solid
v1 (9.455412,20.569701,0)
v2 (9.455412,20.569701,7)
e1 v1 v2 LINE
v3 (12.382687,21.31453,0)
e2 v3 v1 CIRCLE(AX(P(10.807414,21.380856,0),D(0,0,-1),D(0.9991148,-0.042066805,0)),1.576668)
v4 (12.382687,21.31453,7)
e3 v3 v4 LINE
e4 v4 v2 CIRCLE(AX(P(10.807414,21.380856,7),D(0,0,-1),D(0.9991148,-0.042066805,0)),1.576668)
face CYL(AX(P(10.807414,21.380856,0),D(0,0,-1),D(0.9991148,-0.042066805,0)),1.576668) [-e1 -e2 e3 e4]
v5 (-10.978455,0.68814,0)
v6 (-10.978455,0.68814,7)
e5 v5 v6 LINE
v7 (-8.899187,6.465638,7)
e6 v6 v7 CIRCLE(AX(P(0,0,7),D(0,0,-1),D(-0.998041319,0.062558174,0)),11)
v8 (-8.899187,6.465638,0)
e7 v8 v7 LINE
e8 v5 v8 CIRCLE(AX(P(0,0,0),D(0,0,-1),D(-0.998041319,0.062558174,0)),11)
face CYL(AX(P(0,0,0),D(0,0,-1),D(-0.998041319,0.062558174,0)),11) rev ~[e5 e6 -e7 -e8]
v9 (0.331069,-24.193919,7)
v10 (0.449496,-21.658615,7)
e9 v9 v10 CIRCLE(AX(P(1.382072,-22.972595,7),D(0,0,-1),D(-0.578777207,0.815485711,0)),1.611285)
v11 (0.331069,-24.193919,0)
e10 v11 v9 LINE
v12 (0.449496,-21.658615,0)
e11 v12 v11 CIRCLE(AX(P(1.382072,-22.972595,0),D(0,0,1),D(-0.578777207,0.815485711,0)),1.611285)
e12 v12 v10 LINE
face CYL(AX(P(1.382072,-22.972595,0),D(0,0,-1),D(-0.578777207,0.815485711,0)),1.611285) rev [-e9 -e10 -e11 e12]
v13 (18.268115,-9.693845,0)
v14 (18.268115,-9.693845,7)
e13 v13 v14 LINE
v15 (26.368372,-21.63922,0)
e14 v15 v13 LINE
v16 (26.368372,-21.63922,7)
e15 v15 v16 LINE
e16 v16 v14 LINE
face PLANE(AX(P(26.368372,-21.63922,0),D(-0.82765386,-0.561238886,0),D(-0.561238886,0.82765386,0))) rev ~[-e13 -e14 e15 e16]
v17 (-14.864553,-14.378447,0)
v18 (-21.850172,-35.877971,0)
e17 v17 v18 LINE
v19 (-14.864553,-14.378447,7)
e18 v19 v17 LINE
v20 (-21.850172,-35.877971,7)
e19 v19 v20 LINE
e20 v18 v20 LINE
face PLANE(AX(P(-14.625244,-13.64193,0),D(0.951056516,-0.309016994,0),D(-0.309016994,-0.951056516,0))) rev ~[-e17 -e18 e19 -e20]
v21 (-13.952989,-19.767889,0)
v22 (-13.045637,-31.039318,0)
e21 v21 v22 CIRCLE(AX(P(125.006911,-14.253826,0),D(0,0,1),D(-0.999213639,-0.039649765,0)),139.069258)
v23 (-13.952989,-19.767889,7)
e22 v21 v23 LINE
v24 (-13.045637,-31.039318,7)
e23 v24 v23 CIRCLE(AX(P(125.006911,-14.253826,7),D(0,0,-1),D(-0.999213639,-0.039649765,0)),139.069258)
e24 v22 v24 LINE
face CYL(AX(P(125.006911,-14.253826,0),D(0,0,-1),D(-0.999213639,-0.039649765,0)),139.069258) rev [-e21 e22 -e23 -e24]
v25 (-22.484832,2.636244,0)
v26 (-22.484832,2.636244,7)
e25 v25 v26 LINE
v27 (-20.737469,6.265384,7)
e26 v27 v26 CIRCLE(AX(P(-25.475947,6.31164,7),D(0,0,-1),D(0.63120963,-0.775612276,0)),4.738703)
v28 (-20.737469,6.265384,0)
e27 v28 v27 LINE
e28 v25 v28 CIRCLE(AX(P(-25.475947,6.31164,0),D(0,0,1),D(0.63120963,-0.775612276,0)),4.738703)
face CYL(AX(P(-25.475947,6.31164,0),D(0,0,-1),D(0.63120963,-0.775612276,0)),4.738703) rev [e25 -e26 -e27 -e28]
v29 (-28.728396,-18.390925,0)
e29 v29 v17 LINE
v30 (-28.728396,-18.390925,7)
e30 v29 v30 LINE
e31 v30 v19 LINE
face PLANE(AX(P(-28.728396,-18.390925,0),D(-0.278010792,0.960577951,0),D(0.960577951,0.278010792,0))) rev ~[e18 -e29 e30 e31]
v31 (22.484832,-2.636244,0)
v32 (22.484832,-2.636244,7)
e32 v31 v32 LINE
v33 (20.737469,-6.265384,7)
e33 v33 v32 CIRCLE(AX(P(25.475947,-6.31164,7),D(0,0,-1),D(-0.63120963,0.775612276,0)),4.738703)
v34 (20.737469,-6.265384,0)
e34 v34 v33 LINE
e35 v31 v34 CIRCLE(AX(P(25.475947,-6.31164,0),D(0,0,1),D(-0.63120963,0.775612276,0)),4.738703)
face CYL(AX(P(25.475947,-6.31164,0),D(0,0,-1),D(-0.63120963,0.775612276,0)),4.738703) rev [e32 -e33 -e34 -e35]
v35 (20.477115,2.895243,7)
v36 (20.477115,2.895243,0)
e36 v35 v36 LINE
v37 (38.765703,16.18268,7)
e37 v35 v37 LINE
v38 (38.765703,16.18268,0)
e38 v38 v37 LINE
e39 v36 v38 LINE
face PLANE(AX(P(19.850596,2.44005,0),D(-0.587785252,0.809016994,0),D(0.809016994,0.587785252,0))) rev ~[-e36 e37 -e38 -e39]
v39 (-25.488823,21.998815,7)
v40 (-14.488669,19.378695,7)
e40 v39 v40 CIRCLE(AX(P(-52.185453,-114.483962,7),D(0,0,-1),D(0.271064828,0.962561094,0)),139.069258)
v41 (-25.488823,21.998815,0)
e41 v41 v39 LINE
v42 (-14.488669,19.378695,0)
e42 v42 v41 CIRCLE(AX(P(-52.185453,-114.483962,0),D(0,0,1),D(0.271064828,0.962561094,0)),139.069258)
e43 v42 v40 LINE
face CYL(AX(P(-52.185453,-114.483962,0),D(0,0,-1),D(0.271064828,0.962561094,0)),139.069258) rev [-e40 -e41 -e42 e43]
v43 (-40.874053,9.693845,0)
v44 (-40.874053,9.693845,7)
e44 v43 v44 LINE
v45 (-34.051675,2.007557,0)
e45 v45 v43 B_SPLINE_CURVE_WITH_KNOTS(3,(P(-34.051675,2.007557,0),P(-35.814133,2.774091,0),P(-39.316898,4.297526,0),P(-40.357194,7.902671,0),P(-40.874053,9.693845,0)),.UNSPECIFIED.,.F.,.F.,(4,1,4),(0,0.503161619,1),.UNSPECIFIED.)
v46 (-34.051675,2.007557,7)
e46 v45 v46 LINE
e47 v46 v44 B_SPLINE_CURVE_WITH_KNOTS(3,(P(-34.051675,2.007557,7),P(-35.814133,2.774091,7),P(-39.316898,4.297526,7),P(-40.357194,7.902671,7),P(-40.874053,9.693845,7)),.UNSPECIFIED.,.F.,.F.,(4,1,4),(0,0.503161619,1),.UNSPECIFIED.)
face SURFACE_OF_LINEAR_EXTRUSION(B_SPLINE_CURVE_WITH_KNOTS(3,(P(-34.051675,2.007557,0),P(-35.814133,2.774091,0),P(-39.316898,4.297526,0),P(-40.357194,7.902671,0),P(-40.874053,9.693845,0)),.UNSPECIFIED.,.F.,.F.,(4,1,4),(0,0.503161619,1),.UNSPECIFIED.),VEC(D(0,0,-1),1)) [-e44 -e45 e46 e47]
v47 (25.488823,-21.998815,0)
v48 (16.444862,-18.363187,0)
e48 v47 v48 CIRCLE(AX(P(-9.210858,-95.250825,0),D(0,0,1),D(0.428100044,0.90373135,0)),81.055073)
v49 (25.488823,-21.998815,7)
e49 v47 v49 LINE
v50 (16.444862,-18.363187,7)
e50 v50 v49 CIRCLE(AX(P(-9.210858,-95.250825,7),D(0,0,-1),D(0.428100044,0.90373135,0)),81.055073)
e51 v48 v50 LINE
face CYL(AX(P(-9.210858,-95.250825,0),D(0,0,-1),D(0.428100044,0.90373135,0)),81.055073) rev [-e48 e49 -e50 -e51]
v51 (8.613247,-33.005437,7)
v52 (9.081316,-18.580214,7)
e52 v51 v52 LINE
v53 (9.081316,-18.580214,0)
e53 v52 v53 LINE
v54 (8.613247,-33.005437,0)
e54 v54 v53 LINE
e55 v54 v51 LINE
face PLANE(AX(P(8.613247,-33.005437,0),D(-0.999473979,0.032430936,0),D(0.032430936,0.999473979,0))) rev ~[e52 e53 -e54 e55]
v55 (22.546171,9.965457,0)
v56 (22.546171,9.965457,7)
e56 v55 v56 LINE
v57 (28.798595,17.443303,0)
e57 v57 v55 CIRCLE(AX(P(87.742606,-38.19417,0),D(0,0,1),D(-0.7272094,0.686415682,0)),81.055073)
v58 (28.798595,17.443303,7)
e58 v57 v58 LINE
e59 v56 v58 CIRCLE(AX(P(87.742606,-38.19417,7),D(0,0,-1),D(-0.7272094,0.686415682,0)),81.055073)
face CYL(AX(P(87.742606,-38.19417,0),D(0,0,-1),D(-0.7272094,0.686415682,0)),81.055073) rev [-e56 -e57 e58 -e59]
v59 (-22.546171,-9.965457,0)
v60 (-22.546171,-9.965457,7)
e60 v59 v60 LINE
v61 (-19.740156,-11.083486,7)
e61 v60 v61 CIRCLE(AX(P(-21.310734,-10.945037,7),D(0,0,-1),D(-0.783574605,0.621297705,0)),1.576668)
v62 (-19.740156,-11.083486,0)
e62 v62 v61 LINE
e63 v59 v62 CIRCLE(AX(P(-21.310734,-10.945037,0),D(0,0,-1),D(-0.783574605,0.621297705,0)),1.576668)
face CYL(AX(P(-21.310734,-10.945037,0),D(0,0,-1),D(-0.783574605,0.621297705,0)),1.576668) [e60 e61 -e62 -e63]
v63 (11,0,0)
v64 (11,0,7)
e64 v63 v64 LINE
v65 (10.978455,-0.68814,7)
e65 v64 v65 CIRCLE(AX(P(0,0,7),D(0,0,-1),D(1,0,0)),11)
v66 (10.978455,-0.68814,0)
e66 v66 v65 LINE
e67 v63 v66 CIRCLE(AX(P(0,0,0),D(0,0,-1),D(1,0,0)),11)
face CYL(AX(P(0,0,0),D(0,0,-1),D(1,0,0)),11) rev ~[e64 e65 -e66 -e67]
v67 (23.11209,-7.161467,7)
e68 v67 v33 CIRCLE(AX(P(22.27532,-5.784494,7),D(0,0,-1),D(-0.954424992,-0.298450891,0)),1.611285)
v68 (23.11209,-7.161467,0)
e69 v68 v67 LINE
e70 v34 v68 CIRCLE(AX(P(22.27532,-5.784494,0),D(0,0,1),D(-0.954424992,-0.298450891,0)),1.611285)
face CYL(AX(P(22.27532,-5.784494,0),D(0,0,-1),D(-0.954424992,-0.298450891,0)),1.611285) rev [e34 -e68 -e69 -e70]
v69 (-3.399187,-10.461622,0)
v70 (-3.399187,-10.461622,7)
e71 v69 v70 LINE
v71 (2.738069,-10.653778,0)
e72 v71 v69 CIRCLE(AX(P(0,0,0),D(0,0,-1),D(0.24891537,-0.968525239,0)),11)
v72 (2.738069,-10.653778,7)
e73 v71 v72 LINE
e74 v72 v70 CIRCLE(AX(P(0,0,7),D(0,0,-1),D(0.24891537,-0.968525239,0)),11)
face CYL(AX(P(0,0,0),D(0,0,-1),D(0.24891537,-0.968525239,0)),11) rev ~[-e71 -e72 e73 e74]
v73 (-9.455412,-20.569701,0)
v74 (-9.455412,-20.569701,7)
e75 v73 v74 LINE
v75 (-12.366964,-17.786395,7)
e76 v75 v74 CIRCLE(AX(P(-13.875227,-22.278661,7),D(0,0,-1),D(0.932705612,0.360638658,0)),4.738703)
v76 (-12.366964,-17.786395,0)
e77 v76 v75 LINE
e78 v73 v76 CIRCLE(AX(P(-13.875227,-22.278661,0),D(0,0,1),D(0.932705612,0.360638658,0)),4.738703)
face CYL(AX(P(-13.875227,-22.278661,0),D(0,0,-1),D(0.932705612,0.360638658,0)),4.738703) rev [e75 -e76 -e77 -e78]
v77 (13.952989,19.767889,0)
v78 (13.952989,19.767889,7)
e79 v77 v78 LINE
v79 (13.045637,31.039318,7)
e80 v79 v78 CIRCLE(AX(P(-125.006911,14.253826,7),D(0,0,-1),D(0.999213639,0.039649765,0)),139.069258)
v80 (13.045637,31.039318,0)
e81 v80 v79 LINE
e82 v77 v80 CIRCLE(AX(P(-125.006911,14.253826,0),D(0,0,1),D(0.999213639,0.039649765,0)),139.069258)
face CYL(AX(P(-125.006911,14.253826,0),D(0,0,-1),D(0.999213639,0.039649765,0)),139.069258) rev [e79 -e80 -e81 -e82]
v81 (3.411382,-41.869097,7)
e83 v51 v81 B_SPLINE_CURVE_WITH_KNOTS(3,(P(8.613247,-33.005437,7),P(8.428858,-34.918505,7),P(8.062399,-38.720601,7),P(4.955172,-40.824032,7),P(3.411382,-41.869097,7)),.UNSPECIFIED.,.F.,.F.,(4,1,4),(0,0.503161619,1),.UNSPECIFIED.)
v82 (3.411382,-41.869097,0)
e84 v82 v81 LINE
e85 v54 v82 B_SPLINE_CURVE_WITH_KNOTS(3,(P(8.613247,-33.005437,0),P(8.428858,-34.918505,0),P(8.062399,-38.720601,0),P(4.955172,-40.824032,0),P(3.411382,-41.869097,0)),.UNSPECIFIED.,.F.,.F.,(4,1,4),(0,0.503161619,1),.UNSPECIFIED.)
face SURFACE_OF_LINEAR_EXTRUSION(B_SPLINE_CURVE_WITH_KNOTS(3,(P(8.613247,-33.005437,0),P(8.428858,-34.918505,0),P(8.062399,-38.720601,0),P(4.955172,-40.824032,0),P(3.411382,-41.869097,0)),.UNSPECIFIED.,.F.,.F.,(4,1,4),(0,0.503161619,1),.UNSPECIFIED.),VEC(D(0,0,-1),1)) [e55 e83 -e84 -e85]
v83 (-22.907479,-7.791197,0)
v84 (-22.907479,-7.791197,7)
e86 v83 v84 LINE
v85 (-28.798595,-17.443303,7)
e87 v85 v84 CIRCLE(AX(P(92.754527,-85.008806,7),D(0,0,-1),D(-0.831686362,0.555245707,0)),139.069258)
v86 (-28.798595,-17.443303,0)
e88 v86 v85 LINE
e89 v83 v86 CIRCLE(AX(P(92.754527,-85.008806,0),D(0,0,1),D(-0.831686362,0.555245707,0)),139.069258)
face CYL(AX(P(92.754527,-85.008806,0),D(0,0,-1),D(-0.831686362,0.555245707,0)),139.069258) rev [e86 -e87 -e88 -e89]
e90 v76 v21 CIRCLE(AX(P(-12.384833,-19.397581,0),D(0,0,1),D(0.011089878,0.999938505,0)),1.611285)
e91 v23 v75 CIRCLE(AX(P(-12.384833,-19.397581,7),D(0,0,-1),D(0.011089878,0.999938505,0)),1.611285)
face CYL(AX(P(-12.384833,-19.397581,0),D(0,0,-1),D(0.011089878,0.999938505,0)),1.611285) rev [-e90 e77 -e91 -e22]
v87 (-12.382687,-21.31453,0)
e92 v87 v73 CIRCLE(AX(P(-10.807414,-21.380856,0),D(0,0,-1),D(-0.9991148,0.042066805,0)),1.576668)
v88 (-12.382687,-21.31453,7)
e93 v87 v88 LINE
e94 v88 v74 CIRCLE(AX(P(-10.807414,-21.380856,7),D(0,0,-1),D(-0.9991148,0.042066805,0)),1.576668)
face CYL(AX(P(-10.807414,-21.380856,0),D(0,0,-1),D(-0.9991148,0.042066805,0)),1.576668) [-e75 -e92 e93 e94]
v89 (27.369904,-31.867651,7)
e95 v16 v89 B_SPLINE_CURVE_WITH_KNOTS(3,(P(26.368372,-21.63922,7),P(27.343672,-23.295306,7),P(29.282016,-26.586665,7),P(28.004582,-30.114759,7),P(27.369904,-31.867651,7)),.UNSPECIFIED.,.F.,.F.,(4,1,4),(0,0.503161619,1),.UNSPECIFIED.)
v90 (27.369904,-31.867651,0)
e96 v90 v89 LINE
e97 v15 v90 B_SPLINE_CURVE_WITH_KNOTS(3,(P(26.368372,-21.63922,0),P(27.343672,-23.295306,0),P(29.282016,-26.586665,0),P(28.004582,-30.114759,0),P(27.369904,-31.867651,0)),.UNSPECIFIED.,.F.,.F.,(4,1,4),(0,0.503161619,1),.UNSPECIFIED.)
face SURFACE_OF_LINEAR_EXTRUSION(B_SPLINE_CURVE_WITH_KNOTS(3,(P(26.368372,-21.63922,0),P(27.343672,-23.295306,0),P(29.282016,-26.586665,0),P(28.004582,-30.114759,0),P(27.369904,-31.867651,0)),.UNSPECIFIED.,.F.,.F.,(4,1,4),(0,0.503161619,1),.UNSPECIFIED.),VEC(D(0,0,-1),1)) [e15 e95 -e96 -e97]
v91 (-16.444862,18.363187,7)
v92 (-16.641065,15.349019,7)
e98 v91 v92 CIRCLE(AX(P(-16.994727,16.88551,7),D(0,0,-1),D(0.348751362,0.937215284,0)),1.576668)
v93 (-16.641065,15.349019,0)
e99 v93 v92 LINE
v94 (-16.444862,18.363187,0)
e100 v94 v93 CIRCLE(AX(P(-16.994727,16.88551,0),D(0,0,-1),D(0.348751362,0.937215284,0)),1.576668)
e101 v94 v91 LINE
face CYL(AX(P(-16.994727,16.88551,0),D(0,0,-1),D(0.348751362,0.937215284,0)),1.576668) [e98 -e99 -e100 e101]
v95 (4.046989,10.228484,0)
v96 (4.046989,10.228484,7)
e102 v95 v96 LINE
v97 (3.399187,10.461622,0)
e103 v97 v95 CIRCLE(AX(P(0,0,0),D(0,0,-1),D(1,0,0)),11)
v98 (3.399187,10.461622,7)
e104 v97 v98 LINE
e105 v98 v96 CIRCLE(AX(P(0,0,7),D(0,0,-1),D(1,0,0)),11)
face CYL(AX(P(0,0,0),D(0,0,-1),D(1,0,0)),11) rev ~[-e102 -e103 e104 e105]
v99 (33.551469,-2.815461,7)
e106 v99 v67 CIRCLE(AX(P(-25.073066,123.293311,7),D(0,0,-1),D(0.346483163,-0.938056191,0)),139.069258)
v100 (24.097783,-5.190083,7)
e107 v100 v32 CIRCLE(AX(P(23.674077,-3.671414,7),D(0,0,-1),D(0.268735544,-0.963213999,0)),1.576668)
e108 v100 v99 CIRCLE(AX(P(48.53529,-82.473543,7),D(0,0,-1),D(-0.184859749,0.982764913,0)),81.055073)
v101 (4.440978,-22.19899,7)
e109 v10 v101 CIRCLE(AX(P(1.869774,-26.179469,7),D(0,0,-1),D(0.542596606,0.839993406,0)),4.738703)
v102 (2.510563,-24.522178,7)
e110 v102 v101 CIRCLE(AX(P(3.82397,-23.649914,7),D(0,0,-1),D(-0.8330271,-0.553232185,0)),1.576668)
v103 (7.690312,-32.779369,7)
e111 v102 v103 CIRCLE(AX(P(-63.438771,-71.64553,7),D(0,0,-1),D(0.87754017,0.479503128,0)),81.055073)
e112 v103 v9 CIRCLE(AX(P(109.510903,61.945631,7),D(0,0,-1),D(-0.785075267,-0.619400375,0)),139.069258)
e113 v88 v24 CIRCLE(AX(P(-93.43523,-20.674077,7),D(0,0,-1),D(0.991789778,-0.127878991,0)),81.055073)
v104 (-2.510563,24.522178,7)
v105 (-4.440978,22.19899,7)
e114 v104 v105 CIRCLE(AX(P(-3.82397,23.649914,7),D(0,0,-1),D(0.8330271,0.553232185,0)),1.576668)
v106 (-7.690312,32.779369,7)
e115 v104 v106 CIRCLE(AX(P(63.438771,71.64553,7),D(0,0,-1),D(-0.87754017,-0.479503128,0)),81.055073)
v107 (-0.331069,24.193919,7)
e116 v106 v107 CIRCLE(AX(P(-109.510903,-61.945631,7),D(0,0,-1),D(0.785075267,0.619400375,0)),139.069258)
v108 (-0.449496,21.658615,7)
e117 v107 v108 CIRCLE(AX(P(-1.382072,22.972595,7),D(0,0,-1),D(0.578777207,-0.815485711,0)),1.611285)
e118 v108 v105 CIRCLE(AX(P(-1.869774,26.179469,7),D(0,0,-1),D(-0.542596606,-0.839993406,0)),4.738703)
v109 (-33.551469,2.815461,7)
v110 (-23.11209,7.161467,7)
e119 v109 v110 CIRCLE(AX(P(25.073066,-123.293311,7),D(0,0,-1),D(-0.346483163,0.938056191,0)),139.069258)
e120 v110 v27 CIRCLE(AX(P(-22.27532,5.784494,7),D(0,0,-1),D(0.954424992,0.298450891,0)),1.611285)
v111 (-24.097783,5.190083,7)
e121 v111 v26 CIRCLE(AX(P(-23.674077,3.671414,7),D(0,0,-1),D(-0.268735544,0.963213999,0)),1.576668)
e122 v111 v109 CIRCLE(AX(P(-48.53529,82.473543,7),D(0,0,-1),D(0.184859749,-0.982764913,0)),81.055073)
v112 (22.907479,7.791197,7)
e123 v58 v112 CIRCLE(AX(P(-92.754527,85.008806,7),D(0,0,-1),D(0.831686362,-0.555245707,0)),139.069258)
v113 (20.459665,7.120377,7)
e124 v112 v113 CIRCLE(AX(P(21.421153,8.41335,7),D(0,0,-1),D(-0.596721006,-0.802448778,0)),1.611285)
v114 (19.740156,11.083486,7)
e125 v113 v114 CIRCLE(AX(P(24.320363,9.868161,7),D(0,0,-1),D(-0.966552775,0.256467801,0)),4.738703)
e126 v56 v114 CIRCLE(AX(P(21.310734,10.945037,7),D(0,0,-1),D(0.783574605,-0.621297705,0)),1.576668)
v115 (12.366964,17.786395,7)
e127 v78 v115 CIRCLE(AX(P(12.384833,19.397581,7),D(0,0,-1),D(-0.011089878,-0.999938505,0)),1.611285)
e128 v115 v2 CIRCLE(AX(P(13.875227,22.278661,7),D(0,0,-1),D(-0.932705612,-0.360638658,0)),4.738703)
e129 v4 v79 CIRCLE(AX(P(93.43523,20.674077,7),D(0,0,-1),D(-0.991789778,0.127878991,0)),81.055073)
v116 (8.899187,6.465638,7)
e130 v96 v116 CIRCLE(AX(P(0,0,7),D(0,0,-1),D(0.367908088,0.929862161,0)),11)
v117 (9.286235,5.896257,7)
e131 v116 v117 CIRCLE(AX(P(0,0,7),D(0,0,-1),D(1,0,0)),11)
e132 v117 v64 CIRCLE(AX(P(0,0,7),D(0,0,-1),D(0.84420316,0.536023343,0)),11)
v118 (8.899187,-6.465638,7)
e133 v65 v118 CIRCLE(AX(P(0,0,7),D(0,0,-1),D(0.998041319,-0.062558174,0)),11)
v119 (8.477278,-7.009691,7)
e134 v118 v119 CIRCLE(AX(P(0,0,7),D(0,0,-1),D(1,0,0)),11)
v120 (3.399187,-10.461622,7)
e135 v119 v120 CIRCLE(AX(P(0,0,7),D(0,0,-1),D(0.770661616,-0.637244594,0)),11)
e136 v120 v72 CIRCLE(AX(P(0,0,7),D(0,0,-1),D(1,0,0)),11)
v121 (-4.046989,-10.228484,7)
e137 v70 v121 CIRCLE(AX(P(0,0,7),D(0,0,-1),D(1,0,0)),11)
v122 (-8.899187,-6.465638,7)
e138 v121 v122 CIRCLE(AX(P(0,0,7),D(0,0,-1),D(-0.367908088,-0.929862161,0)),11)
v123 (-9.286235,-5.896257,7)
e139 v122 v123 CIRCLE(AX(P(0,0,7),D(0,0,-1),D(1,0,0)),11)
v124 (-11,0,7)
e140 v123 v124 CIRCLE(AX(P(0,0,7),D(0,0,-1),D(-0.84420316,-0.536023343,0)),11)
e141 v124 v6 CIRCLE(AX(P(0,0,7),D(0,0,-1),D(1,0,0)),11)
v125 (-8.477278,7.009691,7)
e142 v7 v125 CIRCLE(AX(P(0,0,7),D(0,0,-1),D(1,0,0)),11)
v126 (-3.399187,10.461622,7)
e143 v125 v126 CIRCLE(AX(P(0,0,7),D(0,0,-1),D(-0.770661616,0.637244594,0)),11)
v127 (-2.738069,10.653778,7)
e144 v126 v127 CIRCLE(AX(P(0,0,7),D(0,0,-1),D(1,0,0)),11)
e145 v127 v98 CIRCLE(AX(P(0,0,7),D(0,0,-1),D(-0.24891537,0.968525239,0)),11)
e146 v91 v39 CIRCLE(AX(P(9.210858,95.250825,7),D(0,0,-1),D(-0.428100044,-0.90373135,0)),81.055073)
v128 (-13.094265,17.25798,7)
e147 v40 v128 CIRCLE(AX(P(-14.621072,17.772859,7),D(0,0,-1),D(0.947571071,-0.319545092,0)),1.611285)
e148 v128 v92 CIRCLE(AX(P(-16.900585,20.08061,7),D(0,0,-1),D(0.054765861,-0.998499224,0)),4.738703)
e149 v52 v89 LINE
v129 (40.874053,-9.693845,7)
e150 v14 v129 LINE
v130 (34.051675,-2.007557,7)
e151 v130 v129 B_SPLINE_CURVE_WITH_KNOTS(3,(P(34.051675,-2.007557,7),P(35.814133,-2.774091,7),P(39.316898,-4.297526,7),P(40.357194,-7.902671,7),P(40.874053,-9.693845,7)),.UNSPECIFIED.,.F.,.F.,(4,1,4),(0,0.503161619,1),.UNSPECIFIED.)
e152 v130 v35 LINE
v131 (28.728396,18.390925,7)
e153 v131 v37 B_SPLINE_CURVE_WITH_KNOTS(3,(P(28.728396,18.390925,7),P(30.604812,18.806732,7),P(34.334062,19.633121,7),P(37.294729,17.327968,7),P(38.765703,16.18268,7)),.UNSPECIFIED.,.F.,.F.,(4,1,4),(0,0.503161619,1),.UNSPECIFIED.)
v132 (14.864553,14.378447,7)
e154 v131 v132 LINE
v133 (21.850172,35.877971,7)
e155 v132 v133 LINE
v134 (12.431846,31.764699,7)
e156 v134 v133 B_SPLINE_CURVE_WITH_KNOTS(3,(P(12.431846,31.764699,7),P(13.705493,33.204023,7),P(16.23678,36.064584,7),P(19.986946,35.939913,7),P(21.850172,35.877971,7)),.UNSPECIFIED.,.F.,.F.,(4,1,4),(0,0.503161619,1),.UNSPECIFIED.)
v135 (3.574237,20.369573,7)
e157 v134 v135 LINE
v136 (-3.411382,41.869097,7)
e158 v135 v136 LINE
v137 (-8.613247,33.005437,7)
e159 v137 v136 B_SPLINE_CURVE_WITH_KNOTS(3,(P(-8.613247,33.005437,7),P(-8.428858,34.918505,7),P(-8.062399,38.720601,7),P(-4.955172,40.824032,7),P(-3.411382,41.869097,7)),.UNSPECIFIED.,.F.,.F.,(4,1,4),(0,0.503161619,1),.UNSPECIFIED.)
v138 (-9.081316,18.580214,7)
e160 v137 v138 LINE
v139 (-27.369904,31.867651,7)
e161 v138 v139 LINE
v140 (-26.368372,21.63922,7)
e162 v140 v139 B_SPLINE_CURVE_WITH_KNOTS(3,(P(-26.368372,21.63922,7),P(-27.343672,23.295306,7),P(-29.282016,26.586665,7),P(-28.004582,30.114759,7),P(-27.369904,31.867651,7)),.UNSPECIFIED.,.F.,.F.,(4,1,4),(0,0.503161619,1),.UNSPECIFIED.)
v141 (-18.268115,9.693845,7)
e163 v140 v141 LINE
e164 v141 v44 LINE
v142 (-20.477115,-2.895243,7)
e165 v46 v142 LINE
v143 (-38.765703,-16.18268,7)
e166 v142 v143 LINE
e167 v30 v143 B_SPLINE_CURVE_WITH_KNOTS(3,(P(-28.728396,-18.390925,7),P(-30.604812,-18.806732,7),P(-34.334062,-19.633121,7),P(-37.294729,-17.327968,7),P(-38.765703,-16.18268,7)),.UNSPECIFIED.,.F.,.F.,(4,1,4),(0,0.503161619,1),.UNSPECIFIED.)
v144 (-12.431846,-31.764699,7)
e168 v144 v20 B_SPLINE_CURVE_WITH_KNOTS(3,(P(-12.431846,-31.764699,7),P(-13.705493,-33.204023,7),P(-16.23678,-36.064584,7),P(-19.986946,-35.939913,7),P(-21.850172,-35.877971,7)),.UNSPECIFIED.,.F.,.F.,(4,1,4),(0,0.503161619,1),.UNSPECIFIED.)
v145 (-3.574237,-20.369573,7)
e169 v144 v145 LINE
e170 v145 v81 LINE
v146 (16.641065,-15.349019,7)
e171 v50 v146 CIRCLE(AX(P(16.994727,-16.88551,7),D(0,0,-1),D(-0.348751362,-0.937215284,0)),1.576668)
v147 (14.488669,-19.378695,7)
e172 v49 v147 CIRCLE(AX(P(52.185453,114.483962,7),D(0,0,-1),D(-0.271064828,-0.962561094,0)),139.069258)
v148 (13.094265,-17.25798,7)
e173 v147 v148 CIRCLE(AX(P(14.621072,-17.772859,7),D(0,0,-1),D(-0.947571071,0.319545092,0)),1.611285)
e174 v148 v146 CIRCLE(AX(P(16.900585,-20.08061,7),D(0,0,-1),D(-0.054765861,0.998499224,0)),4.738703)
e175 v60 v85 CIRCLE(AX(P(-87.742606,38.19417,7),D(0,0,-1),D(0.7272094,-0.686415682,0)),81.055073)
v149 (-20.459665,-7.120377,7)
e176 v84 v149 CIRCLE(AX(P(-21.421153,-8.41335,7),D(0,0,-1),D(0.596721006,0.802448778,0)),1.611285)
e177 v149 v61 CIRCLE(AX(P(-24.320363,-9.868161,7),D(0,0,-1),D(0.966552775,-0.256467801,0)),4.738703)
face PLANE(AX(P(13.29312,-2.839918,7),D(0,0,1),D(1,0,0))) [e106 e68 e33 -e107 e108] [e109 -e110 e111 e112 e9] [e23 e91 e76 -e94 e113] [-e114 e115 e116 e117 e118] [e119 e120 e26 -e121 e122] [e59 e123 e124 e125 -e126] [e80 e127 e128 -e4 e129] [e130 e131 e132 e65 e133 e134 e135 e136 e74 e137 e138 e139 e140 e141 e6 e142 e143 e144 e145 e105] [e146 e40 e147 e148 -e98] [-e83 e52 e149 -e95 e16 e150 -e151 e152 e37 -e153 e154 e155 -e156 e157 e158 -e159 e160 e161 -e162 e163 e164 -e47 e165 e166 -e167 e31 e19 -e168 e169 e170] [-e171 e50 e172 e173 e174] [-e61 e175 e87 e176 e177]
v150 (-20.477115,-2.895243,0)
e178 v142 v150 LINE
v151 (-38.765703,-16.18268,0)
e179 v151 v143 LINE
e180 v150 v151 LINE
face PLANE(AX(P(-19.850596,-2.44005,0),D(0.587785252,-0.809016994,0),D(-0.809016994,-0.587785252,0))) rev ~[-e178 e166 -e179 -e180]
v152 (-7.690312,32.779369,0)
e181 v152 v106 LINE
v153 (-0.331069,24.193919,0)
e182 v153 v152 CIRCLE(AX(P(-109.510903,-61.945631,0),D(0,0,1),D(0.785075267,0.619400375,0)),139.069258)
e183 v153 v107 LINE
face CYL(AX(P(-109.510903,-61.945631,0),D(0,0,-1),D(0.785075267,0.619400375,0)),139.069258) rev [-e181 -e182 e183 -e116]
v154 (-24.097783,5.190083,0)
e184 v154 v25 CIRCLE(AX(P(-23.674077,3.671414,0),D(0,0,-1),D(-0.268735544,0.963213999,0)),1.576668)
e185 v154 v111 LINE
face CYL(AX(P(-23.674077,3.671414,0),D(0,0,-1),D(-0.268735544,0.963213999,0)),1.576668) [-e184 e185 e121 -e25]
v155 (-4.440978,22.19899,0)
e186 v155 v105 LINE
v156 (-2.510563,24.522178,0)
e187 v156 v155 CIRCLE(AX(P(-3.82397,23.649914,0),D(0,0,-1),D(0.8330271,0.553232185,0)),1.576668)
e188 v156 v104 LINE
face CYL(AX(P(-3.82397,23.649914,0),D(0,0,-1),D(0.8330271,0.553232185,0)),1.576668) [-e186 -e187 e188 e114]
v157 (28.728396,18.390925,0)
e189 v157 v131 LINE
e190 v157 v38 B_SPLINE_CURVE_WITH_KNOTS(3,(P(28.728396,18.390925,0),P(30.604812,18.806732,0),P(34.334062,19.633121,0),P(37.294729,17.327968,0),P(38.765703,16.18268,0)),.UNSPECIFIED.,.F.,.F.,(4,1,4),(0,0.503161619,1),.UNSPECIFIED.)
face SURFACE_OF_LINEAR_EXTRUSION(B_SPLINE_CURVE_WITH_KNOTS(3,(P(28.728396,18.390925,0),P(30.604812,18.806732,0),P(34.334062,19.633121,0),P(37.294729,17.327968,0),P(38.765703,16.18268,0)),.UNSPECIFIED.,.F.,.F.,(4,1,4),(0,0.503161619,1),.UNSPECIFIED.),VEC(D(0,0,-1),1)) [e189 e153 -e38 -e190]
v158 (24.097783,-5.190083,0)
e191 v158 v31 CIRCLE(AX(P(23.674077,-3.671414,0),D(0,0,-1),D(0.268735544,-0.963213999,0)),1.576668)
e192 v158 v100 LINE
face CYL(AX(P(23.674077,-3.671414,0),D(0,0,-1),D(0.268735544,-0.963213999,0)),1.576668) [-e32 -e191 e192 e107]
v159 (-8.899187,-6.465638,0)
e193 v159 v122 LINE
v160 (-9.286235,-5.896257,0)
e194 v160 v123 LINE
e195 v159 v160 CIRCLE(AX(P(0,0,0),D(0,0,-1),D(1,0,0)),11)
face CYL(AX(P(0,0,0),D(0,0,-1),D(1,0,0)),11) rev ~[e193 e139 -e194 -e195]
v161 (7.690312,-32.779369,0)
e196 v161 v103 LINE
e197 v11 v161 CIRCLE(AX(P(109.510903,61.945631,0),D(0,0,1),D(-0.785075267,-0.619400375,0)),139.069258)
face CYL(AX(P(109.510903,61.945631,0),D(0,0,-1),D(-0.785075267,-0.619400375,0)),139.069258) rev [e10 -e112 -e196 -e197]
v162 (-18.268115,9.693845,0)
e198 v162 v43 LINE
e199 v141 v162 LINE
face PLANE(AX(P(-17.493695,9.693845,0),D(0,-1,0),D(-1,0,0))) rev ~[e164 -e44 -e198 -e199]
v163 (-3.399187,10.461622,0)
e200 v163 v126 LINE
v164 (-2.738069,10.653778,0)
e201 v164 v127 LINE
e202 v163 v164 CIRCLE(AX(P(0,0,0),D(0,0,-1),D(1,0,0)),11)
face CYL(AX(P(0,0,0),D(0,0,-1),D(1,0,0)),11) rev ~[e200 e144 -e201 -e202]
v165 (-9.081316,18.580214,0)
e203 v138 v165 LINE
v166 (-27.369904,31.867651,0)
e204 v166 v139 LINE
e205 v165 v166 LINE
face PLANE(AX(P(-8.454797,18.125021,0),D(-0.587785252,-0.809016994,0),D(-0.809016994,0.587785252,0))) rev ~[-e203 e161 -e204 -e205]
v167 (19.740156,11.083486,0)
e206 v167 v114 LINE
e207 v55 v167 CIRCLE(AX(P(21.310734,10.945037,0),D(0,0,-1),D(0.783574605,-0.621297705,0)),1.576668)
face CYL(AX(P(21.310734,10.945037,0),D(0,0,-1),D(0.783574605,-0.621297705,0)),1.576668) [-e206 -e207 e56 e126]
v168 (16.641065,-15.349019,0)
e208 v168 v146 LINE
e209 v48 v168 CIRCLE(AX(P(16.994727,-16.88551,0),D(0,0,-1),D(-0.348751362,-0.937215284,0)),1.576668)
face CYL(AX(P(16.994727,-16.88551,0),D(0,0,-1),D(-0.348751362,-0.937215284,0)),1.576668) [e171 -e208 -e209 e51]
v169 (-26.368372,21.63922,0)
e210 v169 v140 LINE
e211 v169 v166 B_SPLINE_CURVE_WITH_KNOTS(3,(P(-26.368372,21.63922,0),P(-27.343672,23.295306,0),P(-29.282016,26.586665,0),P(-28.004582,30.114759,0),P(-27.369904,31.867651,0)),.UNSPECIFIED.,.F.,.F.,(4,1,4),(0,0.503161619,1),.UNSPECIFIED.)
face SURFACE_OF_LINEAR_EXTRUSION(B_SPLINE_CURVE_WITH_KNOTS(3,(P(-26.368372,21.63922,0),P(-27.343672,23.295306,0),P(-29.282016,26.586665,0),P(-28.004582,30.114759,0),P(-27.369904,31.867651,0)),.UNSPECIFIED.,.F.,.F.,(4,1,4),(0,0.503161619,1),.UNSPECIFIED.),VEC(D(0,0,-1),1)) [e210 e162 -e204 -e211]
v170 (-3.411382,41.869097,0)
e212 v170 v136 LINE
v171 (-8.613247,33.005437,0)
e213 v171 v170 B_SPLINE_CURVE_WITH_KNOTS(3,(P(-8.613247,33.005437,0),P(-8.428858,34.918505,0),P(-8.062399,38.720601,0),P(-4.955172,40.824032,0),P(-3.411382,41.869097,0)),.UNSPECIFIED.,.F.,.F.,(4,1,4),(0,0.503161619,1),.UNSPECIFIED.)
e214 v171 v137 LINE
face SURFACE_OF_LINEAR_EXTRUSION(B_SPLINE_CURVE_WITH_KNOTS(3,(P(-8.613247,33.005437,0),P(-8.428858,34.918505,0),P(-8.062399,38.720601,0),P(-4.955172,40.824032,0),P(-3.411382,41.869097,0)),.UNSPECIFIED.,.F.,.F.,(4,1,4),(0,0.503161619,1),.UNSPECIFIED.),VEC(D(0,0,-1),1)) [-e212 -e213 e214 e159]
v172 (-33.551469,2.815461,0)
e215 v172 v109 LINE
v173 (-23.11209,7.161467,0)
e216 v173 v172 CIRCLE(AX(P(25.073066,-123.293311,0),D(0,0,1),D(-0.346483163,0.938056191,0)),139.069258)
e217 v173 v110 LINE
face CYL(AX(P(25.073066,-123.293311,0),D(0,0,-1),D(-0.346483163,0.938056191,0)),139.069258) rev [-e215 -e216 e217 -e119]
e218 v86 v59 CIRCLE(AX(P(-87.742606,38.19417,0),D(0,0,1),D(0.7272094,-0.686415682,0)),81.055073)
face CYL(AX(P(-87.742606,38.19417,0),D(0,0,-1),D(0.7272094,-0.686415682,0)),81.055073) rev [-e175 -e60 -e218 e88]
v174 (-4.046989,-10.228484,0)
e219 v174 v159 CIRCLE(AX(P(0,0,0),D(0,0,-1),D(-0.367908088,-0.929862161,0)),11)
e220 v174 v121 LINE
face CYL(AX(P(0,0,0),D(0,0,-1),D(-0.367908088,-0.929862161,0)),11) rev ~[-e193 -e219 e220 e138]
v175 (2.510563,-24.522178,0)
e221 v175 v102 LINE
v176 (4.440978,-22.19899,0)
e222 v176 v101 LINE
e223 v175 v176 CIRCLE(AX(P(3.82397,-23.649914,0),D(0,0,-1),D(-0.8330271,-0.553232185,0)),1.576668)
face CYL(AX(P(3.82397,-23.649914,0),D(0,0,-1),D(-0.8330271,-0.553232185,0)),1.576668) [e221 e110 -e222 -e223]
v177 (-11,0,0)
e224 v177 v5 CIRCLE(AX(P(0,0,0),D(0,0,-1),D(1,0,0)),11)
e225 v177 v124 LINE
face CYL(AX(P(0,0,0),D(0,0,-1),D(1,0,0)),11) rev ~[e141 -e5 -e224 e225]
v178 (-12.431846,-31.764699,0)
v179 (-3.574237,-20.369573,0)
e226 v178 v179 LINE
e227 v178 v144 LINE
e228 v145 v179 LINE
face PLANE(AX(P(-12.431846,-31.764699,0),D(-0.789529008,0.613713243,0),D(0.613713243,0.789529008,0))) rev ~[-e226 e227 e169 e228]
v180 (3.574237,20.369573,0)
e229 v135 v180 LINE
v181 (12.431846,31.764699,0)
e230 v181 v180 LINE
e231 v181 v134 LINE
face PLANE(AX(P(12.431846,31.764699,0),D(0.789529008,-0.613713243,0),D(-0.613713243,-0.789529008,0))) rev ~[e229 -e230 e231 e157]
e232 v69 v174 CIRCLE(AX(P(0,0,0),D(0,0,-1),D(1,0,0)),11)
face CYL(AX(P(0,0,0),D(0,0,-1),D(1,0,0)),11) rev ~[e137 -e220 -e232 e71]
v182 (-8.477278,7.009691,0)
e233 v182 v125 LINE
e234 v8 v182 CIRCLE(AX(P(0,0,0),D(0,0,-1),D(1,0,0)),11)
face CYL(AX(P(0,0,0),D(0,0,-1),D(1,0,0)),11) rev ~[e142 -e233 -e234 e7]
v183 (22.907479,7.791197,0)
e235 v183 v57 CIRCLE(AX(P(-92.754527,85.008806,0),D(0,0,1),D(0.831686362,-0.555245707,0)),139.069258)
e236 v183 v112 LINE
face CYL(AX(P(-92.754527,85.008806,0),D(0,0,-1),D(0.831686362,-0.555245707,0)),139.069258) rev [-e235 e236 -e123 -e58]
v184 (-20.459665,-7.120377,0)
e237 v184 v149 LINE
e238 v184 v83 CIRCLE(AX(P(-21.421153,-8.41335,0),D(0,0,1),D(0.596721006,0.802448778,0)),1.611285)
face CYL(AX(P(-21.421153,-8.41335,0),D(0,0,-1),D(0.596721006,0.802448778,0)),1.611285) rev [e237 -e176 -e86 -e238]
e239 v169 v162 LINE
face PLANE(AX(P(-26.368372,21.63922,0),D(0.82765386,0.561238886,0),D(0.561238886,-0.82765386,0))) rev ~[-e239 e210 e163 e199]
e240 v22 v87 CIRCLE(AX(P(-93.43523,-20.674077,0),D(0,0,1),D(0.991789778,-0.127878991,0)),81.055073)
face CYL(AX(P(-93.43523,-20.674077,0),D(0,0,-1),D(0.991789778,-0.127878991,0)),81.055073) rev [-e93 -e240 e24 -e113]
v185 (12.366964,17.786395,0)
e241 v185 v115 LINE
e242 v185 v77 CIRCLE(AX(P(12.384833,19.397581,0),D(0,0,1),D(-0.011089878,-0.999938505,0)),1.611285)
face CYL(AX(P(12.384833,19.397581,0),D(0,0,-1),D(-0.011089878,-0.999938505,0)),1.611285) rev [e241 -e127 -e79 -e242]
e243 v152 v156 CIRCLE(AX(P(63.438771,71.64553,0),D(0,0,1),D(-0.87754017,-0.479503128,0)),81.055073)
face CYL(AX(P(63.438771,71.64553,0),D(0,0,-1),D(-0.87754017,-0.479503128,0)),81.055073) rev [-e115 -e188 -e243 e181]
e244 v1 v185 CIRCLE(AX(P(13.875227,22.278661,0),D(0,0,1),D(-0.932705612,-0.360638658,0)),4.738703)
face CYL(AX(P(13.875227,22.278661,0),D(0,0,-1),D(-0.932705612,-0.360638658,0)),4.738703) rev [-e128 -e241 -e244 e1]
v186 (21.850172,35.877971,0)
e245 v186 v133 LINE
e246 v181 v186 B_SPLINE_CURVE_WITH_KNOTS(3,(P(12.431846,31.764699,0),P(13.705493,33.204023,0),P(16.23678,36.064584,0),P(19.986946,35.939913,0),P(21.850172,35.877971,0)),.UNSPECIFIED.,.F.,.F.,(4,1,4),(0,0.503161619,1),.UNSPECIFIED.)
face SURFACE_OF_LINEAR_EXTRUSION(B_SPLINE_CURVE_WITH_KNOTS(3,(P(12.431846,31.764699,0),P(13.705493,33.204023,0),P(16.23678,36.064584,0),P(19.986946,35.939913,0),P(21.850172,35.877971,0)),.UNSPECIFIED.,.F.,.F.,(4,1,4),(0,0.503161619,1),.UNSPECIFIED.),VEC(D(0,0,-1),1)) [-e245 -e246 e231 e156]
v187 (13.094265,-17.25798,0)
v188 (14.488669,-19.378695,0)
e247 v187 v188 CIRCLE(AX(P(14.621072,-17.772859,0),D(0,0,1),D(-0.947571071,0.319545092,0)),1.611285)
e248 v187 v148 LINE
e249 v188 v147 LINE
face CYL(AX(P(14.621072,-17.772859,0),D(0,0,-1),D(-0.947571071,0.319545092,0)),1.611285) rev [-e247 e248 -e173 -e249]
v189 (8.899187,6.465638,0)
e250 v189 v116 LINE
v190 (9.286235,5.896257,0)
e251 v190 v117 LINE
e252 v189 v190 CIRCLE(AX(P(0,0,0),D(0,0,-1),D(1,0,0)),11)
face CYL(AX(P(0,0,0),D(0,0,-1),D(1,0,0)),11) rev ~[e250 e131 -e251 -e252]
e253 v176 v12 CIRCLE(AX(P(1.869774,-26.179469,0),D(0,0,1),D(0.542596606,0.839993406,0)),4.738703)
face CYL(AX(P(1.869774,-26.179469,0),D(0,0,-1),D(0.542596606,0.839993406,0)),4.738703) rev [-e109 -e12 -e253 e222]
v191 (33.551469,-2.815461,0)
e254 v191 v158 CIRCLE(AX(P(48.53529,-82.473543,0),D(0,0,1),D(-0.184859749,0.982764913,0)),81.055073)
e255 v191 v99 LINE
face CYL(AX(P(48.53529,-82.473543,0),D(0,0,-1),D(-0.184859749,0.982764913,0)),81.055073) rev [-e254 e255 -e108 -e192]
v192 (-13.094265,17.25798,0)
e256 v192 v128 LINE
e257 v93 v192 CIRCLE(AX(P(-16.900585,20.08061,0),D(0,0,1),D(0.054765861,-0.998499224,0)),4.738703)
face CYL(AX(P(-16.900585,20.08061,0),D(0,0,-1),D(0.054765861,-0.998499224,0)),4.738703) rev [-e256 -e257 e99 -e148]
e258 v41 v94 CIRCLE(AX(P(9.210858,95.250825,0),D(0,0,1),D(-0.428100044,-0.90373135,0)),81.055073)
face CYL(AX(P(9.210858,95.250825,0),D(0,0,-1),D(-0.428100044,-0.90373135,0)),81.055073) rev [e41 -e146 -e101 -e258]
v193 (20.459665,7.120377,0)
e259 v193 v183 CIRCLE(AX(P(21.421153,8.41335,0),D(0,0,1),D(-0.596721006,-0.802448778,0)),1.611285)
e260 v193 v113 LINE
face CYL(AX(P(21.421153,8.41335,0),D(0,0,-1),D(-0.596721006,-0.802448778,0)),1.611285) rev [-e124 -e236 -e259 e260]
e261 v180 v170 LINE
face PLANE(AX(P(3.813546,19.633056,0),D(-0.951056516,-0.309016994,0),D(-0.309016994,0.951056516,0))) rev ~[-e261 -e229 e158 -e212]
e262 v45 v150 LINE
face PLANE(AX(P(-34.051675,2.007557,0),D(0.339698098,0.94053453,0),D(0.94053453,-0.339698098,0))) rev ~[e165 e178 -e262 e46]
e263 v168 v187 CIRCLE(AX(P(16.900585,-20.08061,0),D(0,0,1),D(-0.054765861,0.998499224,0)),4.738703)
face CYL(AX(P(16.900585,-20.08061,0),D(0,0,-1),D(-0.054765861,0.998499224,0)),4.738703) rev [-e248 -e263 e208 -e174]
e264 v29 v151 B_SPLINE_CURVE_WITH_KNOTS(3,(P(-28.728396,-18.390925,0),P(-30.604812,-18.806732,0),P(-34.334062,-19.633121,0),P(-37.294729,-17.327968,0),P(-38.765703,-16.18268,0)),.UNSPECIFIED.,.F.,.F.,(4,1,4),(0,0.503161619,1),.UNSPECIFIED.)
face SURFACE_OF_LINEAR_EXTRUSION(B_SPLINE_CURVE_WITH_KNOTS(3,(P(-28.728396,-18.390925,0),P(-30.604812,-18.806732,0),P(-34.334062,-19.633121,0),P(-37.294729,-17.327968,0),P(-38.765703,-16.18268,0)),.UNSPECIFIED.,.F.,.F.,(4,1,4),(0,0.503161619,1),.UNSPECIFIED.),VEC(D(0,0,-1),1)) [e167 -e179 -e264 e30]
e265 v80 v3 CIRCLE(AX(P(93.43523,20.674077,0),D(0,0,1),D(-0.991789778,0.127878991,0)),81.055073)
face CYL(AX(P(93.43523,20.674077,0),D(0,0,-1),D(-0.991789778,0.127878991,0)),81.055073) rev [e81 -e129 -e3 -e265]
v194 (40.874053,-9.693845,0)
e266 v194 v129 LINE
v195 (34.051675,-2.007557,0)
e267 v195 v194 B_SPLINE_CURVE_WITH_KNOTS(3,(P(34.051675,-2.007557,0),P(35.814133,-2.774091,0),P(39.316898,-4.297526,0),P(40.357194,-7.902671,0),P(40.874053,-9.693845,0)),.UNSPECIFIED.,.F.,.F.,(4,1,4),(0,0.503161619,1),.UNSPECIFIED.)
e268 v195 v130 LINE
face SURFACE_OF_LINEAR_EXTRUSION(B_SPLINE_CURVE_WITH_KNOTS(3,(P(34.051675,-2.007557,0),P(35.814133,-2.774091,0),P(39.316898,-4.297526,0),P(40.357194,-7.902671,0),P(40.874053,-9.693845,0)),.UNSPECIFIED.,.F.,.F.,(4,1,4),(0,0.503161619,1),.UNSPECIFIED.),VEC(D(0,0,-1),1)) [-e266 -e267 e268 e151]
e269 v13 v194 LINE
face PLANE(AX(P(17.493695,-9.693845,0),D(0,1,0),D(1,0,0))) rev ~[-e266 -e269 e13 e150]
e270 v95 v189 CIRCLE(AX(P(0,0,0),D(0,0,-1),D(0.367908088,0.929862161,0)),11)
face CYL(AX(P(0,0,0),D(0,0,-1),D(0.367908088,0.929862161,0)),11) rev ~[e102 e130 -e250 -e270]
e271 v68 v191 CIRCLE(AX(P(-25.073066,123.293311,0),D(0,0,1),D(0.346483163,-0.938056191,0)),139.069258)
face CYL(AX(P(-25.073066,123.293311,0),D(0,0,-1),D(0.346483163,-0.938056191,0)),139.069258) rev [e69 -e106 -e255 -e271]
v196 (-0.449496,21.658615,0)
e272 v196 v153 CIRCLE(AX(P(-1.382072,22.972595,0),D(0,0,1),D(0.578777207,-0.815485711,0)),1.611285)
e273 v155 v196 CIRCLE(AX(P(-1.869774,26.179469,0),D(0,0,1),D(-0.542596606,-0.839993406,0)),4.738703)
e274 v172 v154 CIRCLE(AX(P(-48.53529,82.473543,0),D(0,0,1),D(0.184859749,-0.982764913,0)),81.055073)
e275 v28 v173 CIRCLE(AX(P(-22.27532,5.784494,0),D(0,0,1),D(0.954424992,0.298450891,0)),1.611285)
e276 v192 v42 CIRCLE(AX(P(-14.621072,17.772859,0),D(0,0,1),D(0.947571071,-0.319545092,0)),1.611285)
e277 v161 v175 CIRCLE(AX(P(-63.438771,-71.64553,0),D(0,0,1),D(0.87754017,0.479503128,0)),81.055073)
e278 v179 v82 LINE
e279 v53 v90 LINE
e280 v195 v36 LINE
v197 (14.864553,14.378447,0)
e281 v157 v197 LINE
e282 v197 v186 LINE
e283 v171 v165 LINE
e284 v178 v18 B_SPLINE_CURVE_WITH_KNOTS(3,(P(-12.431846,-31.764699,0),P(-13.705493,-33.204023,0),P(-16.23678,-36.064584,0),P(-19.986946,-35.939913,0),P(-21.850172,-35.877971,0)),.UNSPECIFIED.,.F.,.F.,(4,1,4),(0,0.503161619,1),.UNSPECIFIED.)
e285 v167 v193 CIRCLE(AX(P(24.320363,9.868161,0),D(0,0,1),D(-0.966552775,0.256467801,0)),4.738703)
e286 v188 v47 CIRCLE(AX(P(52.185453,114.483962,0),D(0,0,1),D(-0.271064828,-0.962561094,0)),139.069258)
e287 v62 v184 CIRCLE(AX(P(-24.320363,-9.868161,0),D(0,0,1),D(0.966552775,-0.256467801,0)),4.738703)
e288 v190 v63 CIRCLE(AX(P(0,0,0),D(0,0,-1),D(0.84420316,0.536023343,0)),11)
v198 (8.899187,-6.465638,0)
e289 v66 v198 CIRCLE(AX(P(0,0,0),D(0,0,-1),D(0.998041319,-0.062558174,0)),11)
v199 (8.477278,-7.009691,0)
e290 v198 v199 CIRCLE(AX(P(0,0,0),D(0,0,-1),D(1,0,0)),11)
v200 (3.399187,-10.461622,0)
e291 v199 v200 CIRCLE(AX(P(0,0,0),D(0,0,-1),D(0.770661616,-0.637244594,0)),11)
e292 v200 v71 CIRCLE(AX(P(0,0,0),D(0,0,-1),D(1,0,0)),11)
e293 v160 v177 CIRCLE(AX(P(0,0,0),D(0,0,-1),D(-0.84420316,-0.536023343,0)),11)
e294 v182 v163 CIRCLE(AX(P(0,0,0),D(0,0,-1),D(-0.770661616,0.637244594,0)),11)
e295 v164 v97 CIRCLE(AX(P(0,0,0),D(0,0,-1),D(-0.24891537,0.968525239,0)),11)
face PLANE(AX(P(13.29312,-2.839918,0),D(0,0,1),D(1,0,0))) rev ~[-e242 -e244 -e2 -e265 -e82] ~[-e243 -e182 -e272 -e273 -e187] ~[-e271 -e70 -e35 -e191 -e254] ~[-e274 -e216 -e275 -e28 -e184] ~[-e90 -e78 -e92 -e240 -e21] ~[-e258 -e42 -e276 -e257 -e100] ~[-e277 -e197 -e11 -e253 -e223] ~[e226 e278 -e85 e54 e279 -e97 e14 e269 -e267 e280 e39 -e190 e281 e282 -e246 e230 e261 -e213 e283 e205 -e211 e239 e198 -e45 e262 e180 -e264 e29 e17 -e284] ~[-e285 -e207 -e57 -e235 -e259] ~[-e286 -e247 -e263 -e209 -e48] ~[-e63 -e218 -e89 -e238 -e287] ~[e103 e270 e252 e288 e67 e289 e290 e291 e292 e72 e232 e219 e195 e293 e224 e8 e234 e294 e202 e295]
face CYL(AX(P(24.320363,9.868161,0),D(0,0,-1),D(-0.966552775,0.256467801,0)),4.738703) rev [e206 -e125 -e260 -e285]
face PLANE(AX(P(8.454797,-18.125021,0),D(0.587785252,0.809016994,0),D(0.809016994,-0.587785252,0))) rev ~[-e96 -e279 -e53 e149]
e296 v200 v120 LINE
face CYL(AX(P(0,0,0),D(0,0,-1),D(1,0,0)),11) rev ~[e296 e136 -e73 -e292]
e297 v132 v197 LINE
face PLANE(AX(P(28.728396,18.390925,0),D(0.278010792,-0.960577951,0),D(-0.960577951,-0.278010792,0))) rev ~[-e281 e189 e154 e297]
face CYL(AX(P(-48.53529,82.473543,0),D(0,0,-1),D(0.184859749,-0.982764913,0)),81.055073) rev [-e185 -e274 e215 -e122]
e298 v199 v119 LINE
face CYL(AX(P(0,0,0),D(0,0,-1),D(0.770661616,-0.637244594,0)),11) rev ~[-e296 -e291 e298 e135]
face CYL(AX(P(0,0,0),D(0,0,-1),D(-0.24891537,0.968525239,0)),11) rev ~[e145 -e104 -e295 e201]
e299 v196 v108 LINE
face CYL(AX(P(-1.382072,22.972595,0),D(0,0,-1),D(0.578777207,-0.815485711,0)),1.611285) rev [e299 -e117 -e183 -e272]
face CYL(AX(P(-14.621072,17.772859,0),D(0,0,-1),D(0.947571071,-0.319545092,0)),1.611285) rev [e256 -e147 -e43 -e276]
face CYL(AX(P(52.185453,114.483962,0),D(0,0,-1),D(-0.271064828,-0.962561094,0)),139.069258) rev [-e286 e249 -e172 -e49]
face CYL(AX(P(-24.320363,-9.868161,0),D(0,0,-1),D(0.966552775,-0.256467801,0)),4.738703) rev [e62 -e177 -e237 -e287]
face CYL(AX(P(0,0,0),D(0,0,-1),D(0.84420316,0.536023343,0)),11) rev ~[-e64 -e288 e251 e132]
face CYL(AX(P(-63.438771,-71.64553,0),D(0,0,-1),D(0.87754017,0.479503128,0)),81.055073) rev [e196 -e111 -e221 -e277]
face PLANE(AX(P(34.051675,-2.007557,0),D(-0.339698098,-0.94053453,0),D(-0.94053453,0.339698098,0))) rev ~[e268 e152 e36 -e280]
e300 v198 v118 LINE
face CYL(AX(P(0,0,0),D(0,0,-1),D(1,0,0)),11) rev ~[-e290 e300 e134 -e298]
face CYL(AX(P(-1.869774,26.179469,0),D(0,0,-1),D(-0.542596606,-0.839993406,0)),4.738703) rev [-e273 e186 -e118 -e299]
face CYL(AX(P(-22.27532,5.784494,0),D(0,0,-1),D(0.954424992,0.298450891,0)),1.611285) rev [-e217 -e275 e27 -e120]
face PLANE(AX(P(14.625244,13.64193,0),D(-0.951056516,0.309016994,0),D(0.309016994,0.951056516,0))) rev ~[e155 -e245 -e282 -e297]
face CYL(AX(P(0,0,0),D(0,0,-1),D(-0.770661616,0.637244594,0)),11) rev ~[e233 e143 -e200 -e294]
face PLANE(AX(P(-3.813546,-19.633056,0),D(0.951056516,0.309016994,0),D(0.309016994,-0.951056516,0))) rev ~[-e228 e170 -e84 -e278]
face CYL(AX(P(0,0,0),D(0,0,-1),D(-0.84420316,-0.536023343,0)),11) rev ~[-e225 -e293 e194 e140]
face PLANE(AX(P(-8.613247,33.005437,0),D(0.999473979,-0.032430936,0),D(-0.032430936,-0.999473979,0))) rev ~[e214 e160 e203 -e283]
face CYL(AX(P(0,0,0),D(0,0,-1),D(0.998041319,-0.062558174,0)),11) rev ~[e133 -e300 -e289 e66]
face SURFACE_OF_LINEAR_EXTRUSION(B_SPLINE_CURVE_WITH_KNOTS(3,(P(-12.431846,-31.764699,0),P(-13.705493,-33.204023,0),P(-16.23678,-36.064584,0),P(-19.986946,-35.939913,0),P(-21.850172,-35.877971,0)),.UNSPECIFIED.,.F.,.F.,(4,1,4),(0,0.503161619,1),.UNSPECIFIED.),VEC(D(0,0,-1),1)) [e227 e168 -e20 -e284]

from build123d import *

# Parameters (mm, degrees)
F1_DEPTH      = 7
F3_DEPTH      = 80
F3_DEPTH_BACK = 25
F4_COUNT      = 10


# Not quite as in the source:
# - an extrude ends at something that could not be found from the text; its depth is read off the source's solid


with BuildPart() as f1:
    # F0 (on Top) → F1 (new body)
    with BuildSketch(Plane.XY):
        with BuildLine():
            ThreePointArc((9.2862347639, 5.8962567709), (10.5628732456, 3.0701317233), (11, 0))
            ThreePointArc((11, 0), (9.4389817008, -5.6485063912), (5.1989773724, -9.6938451752))
            Line((5.1989773724, -9.6938451752), (17.4936950276, -9.6938451752))
            ThreePointArc((17.4936950276, -9.6938451752), (19.3632887257, -5.0063010021), (20, 0))
            ThreePointArc((20, 0), (19.9371690623, 1.5840737934), (19.7490710217, 3.1581947026))
            Line((19.7490710217, 3.1581947026), (12.9913196682, 5.5989294212))
            ThreePointArc((12.9913196682, 5.5989294212), (12.1549883134, 5.8213640414), (11.2928291783, 5.8962567709))
            Line((11.2928291783, 5.8962567709), (9.2862347639, 5.8962567709))
        make_face()
        with BuildLine():
            ThreePointArc((5.1989773724, -9.6938451752), (-10.6404023576, 2.7895945347), (9.2862347639, 5.8962567709))
            Line((9.2862347639, 5.8962567709), (11.2928291783, 5.8962567709))
            ThreePointArc((11.2928291783, 5.8962567709), (12.1549883134, 5.8213640414), (12.9913196682, 5.5989294212))
            Line((12.9913196682, 5.5989294212), (19.7490710217, 3.1581947026))
            ThreePointArc((19.7490710217, 3.1581947026), (-19.6989755573, 3.4569295616), (17.4936950276, -9.6938451752))
            Line((17.4936950276, -9.6938451752), (5.1989773724, -9.6938451752))
        make_face()
        with BuildLine():
            ThreePointArc((20, 0), (19.3632887257, -5.0063010021), (17.4936950276, -9.6938451752))
            Line((17.4936950276, -9.6938451752), (40.8740527928, -9.6938451752))
            add(Edge.make_bspline(
                [(34.0516753495, -2.0075566135), (35.8141325987, -2.7740908853), (39.3168982789, -4.2975263847), (40.357193967, -7.9026709732), (40.8740527928, -9.6938451752)],
                knots=[0, 0, 0, 0, 0.5031616186, 1, 1, 1, 1], degree=3))
            Line((34.0516753495, -2.0075566135), (19.7490710217, 3.1581947026))
            ThreePointArc((19.7490710217, 3.1581947026), (19.9371690623, 1.5840737934), (20, 0))
        make_face()
    extrude(amount=F1_DEPTH)

    # F2 (on Top) → F3 (cut, two sides)
    with BuildSketch(Plane.XY) as f3_sk:
        with BuildLine():
            ThreePointArc((24.097783491, -5.1900828257), (22.3410218592, -4.5133442837), (22.484831512, -2.6362440549))
            ThreePointArc((22.484831512, -2.6362440549), (21.2063665687, -4.2559181051), (20.7374691963, -6.2653836794))
            ThreePointArc((20.7374691963, -6.2653836794), (21.7064439422, -7.2920152577), (23.1120903045, -7.1614673361))
            ThreePointArc((23.1120903045, -7.1614673361), (28.3759705314, -5.094612778), (33.5514694452, -2.8154607862))
            ThreePointArc((33.5514694452, -2.8154607862), (28.7888988276, -3.8605353205), (24.097783491, -5.1900828257))
        make_face()
    extrude(amount=-F3_DEPTH, mode=Mode.SUBTRACT)
    extrude(f3_sk.sketch, amount=F3_DEPTH_BACK, mode=Mode.SUBTRACT)

    # F4: F1 ×10 about axis
    f4_axis = Axis((0, 0, 7), (0, 0, 1))


with BuildPart() as f1_1:
    add(f1.part)
    for i in range(1, F4_COUNT):
        add(f1.part.rotate(f4_axis, i * 360 / F4_COUNT))


solid = f1_1.part
